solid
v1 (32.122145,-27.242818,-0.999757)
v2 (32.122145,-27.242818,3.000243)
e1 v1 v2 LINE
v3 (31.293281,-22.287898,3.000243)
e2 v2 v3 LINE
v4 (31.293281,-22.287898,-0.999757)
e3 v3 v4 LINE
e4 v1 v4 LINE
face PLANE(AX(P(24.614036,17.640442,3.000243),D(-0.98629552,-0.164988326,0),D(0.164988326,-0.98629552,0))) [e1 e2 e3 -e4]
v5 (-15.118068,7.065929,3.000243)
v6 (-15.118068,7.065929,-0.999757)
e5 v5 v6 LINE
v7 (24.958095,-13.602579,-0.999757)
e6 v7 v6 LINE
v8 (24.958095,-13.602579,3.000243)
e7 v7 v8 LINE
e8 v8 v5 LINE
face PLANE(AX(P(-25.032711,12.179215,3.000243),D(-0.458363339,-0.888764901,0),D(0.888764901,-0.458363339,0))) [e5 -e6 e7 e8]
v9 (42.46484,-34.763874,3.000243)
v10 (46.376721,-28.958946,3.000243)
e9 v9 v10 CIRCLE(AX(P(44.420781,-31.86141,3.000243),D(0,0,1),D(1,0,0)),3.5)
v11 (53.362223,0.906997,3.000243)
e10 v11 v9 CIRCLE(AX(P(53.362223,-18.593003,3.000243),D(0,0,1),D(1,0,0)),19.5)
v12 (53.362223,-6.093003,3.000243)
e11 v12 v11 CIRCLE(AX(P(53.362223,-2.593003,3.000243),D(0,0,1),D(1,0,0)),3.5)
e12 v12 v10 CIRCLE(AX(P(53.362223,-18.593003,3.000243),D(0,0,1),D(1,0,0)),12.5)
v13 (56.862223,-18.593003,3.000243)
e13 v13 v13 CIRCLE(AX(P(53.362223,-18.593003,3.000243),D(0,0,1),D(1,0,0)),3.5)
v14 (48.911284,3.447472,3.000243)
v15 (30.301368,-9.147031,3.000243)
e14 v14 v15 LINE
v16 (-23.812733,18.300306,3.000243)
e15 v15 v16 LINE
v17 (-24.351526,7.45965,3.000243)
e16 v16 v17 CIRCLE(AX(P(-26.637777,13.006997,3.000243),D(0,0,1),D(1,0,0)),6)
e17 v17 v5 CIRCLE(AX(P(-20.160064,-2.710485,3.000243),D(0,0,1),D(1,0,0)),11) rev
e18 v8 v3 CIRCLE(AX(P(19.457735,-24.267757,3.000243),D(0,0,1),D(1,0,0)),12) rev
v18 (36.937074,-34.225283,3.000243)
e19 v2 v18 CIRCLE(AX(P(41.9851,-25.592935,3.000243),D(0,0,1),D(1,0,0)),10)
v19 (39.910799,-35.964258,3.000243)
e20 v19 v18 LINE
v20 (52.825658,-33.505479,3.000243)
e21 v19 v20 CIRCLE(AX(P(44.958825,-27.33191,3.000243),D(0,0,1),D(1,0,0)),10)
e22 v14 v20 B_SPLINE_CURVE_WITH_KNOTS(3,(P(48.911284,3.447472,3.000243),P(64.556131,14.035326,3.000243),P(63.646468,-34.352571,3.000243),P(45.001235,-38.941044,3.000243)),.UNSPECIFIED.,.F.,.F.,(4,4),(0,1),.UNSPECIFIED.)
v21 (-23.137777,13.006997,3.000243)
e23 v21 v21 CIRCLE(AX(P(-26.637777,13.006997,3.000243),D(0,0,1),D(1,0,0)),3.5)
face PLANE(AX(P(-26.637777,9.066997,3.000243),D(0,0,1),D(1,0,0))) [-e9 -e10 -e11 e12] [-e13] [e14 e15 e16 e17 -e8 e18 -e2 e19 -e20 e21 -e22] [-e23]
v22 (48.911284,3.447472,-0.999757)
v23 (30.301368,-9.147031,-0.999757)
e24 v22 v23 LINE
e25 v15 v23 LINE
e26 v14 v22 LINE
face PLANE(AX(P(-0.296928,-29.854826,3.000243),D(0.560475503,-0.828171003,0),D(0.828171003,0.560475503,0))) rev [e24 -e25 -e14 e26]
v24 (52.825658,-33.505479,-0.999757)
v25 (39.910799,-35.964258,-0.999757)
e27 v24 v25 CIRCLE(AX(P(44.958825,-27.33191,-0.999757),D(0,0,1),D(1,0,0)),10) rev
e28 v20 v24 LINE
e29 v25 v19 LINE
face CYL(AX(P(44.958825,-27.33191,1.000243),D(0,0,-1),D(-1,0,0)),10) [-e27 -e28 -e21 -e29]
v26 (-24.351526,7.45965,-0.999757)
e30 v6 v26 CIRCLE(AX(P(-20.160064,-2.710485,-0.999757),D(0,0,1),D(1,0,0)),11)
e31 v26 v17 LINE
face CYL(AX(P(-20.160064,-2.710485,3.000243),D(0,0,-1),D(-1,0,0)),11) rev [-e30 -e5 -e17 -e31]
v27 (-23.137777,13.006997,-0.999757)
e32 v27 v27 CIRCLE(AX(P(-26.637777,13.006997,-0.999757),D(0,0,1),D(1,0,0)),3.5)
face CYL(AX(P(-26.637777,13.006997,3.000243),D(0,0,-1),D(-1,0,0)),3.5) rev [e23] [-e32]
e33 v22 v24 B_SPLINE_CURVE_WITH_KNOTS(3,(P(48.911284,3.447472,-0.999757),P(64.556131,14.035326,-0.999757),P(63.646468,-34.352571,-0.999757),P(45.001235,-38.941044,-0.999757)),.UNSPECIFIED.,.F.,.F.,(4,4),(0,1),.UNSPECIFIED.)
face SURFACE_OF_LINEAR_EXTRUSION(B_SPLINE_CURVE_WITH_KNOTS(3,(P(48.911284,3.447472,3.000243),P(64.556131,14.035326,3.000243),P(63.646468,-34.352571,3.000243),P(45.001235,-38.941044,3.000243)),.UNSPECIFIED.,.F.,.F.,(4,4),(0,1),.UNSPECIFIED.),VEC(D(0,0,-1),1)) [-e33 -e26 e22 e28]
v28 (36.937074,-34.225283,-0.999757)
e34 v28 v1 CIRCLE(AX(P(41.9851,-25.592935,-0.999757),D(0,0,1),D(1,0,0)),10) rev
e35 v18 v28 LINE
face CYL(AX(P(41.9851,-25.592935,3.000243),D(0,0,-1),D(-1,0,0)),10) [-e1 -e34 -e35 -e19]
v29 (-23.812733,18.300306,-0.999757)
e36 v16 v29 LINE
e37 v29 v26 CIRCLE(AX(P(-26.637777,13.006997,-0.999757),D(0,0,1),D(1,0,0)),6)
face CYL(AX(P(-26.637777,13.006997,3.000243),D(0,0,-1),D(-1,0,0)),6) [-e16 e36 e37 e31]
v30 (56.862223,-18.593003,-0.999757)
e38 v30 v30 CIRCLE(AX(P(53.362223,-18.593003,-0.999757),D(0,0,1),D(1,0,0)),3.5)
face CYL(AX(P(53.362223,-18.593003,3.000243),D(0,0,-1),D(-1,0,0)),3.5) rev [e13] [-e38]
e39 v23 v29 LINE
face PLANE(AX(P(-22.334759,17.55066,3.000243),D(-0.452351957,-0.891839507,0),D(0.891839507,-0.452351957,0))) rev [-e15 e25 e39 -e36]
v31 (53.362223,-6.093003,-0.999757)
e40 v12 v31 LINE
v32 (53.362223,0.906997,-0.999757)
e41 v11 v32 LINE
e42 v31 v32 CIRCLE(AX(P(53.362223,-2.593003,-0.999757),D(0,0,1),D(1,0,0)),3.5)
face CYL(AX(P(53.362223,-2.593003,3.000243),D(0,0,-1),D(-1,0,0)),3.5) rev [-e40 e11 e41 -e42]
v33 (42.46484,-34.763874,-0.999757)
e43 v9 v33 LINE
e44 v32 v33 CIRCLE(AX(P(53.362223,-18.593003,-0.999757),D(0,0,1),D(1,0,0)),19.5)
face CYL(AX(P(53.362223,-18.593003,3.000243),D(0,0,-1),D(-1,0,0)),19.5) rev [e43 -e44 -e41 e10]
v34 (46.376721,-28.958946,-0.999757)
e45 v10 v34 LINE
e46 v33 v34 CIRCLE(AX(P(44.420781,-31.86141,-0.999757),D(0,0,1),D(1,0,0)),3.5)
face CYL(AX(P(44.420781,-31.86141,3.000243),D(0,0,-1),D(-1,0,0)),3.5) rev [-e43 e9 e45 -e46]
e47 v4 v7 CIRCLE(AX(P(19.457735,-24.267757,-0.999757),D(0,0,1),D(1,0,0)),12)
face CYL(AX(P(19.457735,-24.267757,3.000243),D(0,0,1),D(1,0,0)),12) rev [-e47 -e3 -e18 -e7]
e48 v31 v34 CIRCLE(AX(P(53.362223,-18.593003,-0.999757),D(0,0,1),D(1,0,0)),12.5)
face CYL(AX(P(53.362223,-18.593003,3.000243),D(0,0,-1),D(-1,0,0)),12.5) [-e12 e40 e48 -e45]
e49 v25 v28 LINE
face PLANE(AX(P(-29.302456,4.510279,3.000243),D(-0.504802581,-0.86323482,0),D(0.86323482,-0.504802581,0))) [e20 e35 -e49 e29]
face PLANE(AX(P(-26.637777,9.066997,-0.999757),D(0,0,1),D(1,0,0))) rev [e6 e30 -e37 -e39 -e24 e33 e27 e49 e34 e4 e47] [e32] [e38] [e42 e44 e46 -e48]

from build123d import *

# Parameters (mm, degrees)
SKETCH1_R           = 1.75
BOSS_EXTRUDE1_DEPTH = 2
SCALE1_DEPTH        = 2
SCALE1_START        = -0.999756802
SCALE1_2_OUTLINE_R  = 3.5
SCALE1_2_DEPTH      = 4
FILLET1_R           = 12
FILLET3_R           = 11
FILLET5_R           = 10


# Read off the part's stored shape, not the designer's step: Scale1
with BuildPart() as part:
    # Sketch1 → Boss-Extrude1 (new body)
    with BuildSketch(Plane.XY):
        with BuildLine():
            Line((37.774530777, -2.80976251), (28.469572838, -9.10701388))
            Line((28.469572838, -9.10701388), (1.412522165, 4.616654706))
            ThreePointArc((1.412522165, 4.616654706), (-2.864052097, 1.077136302), (2.666294703, 0.594909982))
            Line((2.666294703, 0.594909982), (28.469572838, -12.71263256))
            Line((28.469572838, -12.71263256), (29.76626198, -20.464203372))
            Line((29.76626198, -20.464203372), (35.819506235, -24.004020415))
            add(Edge.make_bspline(
                [(37.774530777, -2.80976251), (45.596954448, 2.484164502), (45.142122532, -21.709783765), (35.819506235, -24.004020415)],
                knots=[0, 0, 0, 0, 1, 1, 1, 1], degree=3))
        make_face()
        with Locations((0, 1.97)):
            Circle(SKETCH1_R, mode=Mode.SUBTRACT)
        with Locations((40, -13.83)):
            Circle(SKETCH1_R, mode=Mode.SUBTRACT)
        with BuildLine():
            ThreePointArc((40, -7.58), (41.75, -5.83), (40, -4.08))
            ThreePointArc((40, -4.08), (30.675422402, -10.981359514), (34.551308869, -21.91543536))
            ThreePointArc((34.551308869, -21.91543536), (36.98051106, -21.442173575), (36.507249275, -19.012971384))
            ThreePointArc((36.507249275, -19.012971384), (34.022706668, -12.003948406), (40, -7.58))
        make_face(mode=Mode.SUBTRACT)
    extrude(amount=BOSS_EXTRUDE1_DEPTH)

    # Scale1 outline → Scale1 (cut)
    with BuildSketch(Plane.XY):
        with BuildLine():
            Line((37.166911335, -4.500685523), (40.588309586, -2.185209734))
            add(Edge.make_bspline(
                [(37.774530777, -2.80976251), (38.877601708, -2.063244904), (39.816079935, -1.903091828), (40.588309586, -2.185209734)],
                knots=[0, 0, 0, 0, 0.141013959, 0.141013959, 0.141013959, 0.141013959], degree=3))
            Line((37.774530777, -2.80976251), (29.220510655, -8.598806941))
            Line((29.220510655, -8.598806941), (30.301368209, -9.147031174))
            Line((30.301368209, -9.147031174), (32.392388987, -7.731905652))
            ThreePointArc((32.392388987, -7.731905652), (34.535363844, -5.75533272), (37.166911335, -4.500685523))
        make_face()
        with BuildLine():
            add(Edge.make_bspline(
                [(41.674674498, -2.9836722), (42.973808679, -4.53190383), (43.478218434, -7.820529427), (43.170733001, -11.35535593)],
                knots=[0.215661709, 0.215661709, 0.215661709, 0.215661709, 0.523164808, 0.523164808, 0.523164808, 0.523164808], degree=3))
            ThreePointArc((41.674674498, -2.9836722), (40.978551915, -3.529979081), (40.307930669, -4.107304814))
            ThreePointArc((40.307930669, -4.107304814), (41.743160431, -5.984569442), (40, -7.58))
            ThreePointArc((40, -7.58), (38.251209419, -7.829647385), (36.642124757, -8.558645918))
            ThreePointArc((36.642124757, -8.558645918), (34.994244779, -12.045683869), (34.064898938, -15.788845421))
            ThreePointArc((34.064898938, -15.788845421), (35.018048135, -17.603944304), (36.507249275, -19.012971384))
            ThreePointArc((36.507249275, -19.012971384), (36.98051106, -21.442173575), (34.551308869, -21.91543536))
            ThreePointArc((34.551308869, -21.91543536), (34.320026917, -21.754670705), (34.093485318, -21.587292331))
            ThreePointArc((34.093485318, -21.587292331), (34.234790142, -22.386594073), (34.409236622, -23.179322749))
            Line((34.409236622, -23.179322749), (35.819506235, -24.004020415))
            add(Edge.make_bspline(
                [(40.894606009, -19.492190926), (39.678153764, -21.750341152), (37.988934356, -23.470137935), (35.819506235, -24.004020415)],
                knots=[0.767294067, 0.767294067, 0.767294067, 0.767294067, 1, 1, 1, 1], degree=3))
            ThreePointArc((40.894606009, -19.492190926), (40.948505364, -17.126843118), (41.447135601, -14.814021622))
            ThreePointArc((41.447135601, -14.814021622), (38.35159174, -13.242420041), (41.74328031, -13.983211488))
            ThreePointArc((41.74328031, -13.983211488), (42.378136793, -12.626441553), (43.170733001, -11.35535593))
        make_face()
        Polygon((29.76626198, -20.464203372), (31.120707631, -21.256256294), (30.301368209, -16.358268534), (28.964044419, -15.668569608), align=None)
        with BuildLine():
            ThreePointArc((-2.699495917, 0.661290027), (-1.375090017, -0.696294703), (0.498906862, -0.988224458))
            Line((0.498906862, -0.988224458), (-2.699495917, 0.661290027))
        make_face()
    extrude(amount=SCALE1_DEPTH, mode=Mode.SUBTRACT)

    # Scale1 2 outline → Scale1 2 (add)
    with BuildSketch(Plane.XY.offset(SCALE1_START)):
        with BuildLine():
            add(Edge.make_bspline(
                [(48.911284088, 3.447471566), (64.556131429, 14.03532559), (63.646467598, -34.352570942), (45.001235003, -38.941044242)],
                knots=[0, 0, 0, 0, 1, 1, 1, 1], degree=3))
            Line((48.911284088, 3.447471566), (30.301368209, -9.147031174))
            Line((30.301368209, -9.147031174), (-23.812733137, 18.300305999))
            ThreePointArc((-23.812733137, 18.300305999), (-32.365881661, 11.221269191), (-21.305188061, 10.256816551))
            Line((-21.305188061, 10.256816551), (30.301368209, -16.358268534))
            Line((30.301368209, -16.358268534), (32.894746493, -31.861410158))
            Line((32.894746493, -31.861410158), (45.001235003, -38.941044242))
        make_face()
        with BuildLine():
            ThreePointArc((42.464840271, -34.763874133), (34.713067338, -12.89572244), (53.362222534, 0.906996587))
            ThreePointArc((53.362222534, 0.906996587), (56.862222534, -2.593003413), (53.362222534, -6.093003413))
            ThreePointArc((53.362222534, -6.093003413), (41.40763587, -14.940900225), (46.376721083, -28.958946182))
            ThreePointArc((46.376721083, -28.958946182), (47.323244653, -33.817350564), (42.464840271, -34.763874133))
        make_face(mode=Mode.SUBTRACT)
        with Locations((53.362222534, -18.593003413)):
            Circle(SCALE1_2_OUTLINE_R, mode=Mode.SUBTRACT)
        with Locations((-26.637777466, 13.006996587)):
            Circle(SCALE1_2_OUTLINE_R, mode=Mode.SUBTRACT)
    extrude(amount=SCALE1_2_DEPTH)

    # Fillet1
    fillet1_edges = [part.edges().sort_by_distance(p)[0] for p in [
        (30.301368209, -16.358268534, 1),
    ]]
    fillet(fillet1_edges, radius=FILLET1_R)

    # Fillet3
    fillet3_edges = [part.edges().sort_by_distance(p)[0] for p in [
        (-21.305188061, 10.256816551, 1.000243198),
    ]]
    fillet(fillet3_edges, radius=FILLET3_R)

    # Fillet5
    fillet5_edges = [part.edges().sort_by_distance(p)[0] for p in [
        (45.001235003, -38.941044242, 1.000243198),
        (32.894746493, -31.861410158, 1.000243198),
    ]]
    fillet(fillet5_edges, radius=FILLET5_R)


solid = part.part
